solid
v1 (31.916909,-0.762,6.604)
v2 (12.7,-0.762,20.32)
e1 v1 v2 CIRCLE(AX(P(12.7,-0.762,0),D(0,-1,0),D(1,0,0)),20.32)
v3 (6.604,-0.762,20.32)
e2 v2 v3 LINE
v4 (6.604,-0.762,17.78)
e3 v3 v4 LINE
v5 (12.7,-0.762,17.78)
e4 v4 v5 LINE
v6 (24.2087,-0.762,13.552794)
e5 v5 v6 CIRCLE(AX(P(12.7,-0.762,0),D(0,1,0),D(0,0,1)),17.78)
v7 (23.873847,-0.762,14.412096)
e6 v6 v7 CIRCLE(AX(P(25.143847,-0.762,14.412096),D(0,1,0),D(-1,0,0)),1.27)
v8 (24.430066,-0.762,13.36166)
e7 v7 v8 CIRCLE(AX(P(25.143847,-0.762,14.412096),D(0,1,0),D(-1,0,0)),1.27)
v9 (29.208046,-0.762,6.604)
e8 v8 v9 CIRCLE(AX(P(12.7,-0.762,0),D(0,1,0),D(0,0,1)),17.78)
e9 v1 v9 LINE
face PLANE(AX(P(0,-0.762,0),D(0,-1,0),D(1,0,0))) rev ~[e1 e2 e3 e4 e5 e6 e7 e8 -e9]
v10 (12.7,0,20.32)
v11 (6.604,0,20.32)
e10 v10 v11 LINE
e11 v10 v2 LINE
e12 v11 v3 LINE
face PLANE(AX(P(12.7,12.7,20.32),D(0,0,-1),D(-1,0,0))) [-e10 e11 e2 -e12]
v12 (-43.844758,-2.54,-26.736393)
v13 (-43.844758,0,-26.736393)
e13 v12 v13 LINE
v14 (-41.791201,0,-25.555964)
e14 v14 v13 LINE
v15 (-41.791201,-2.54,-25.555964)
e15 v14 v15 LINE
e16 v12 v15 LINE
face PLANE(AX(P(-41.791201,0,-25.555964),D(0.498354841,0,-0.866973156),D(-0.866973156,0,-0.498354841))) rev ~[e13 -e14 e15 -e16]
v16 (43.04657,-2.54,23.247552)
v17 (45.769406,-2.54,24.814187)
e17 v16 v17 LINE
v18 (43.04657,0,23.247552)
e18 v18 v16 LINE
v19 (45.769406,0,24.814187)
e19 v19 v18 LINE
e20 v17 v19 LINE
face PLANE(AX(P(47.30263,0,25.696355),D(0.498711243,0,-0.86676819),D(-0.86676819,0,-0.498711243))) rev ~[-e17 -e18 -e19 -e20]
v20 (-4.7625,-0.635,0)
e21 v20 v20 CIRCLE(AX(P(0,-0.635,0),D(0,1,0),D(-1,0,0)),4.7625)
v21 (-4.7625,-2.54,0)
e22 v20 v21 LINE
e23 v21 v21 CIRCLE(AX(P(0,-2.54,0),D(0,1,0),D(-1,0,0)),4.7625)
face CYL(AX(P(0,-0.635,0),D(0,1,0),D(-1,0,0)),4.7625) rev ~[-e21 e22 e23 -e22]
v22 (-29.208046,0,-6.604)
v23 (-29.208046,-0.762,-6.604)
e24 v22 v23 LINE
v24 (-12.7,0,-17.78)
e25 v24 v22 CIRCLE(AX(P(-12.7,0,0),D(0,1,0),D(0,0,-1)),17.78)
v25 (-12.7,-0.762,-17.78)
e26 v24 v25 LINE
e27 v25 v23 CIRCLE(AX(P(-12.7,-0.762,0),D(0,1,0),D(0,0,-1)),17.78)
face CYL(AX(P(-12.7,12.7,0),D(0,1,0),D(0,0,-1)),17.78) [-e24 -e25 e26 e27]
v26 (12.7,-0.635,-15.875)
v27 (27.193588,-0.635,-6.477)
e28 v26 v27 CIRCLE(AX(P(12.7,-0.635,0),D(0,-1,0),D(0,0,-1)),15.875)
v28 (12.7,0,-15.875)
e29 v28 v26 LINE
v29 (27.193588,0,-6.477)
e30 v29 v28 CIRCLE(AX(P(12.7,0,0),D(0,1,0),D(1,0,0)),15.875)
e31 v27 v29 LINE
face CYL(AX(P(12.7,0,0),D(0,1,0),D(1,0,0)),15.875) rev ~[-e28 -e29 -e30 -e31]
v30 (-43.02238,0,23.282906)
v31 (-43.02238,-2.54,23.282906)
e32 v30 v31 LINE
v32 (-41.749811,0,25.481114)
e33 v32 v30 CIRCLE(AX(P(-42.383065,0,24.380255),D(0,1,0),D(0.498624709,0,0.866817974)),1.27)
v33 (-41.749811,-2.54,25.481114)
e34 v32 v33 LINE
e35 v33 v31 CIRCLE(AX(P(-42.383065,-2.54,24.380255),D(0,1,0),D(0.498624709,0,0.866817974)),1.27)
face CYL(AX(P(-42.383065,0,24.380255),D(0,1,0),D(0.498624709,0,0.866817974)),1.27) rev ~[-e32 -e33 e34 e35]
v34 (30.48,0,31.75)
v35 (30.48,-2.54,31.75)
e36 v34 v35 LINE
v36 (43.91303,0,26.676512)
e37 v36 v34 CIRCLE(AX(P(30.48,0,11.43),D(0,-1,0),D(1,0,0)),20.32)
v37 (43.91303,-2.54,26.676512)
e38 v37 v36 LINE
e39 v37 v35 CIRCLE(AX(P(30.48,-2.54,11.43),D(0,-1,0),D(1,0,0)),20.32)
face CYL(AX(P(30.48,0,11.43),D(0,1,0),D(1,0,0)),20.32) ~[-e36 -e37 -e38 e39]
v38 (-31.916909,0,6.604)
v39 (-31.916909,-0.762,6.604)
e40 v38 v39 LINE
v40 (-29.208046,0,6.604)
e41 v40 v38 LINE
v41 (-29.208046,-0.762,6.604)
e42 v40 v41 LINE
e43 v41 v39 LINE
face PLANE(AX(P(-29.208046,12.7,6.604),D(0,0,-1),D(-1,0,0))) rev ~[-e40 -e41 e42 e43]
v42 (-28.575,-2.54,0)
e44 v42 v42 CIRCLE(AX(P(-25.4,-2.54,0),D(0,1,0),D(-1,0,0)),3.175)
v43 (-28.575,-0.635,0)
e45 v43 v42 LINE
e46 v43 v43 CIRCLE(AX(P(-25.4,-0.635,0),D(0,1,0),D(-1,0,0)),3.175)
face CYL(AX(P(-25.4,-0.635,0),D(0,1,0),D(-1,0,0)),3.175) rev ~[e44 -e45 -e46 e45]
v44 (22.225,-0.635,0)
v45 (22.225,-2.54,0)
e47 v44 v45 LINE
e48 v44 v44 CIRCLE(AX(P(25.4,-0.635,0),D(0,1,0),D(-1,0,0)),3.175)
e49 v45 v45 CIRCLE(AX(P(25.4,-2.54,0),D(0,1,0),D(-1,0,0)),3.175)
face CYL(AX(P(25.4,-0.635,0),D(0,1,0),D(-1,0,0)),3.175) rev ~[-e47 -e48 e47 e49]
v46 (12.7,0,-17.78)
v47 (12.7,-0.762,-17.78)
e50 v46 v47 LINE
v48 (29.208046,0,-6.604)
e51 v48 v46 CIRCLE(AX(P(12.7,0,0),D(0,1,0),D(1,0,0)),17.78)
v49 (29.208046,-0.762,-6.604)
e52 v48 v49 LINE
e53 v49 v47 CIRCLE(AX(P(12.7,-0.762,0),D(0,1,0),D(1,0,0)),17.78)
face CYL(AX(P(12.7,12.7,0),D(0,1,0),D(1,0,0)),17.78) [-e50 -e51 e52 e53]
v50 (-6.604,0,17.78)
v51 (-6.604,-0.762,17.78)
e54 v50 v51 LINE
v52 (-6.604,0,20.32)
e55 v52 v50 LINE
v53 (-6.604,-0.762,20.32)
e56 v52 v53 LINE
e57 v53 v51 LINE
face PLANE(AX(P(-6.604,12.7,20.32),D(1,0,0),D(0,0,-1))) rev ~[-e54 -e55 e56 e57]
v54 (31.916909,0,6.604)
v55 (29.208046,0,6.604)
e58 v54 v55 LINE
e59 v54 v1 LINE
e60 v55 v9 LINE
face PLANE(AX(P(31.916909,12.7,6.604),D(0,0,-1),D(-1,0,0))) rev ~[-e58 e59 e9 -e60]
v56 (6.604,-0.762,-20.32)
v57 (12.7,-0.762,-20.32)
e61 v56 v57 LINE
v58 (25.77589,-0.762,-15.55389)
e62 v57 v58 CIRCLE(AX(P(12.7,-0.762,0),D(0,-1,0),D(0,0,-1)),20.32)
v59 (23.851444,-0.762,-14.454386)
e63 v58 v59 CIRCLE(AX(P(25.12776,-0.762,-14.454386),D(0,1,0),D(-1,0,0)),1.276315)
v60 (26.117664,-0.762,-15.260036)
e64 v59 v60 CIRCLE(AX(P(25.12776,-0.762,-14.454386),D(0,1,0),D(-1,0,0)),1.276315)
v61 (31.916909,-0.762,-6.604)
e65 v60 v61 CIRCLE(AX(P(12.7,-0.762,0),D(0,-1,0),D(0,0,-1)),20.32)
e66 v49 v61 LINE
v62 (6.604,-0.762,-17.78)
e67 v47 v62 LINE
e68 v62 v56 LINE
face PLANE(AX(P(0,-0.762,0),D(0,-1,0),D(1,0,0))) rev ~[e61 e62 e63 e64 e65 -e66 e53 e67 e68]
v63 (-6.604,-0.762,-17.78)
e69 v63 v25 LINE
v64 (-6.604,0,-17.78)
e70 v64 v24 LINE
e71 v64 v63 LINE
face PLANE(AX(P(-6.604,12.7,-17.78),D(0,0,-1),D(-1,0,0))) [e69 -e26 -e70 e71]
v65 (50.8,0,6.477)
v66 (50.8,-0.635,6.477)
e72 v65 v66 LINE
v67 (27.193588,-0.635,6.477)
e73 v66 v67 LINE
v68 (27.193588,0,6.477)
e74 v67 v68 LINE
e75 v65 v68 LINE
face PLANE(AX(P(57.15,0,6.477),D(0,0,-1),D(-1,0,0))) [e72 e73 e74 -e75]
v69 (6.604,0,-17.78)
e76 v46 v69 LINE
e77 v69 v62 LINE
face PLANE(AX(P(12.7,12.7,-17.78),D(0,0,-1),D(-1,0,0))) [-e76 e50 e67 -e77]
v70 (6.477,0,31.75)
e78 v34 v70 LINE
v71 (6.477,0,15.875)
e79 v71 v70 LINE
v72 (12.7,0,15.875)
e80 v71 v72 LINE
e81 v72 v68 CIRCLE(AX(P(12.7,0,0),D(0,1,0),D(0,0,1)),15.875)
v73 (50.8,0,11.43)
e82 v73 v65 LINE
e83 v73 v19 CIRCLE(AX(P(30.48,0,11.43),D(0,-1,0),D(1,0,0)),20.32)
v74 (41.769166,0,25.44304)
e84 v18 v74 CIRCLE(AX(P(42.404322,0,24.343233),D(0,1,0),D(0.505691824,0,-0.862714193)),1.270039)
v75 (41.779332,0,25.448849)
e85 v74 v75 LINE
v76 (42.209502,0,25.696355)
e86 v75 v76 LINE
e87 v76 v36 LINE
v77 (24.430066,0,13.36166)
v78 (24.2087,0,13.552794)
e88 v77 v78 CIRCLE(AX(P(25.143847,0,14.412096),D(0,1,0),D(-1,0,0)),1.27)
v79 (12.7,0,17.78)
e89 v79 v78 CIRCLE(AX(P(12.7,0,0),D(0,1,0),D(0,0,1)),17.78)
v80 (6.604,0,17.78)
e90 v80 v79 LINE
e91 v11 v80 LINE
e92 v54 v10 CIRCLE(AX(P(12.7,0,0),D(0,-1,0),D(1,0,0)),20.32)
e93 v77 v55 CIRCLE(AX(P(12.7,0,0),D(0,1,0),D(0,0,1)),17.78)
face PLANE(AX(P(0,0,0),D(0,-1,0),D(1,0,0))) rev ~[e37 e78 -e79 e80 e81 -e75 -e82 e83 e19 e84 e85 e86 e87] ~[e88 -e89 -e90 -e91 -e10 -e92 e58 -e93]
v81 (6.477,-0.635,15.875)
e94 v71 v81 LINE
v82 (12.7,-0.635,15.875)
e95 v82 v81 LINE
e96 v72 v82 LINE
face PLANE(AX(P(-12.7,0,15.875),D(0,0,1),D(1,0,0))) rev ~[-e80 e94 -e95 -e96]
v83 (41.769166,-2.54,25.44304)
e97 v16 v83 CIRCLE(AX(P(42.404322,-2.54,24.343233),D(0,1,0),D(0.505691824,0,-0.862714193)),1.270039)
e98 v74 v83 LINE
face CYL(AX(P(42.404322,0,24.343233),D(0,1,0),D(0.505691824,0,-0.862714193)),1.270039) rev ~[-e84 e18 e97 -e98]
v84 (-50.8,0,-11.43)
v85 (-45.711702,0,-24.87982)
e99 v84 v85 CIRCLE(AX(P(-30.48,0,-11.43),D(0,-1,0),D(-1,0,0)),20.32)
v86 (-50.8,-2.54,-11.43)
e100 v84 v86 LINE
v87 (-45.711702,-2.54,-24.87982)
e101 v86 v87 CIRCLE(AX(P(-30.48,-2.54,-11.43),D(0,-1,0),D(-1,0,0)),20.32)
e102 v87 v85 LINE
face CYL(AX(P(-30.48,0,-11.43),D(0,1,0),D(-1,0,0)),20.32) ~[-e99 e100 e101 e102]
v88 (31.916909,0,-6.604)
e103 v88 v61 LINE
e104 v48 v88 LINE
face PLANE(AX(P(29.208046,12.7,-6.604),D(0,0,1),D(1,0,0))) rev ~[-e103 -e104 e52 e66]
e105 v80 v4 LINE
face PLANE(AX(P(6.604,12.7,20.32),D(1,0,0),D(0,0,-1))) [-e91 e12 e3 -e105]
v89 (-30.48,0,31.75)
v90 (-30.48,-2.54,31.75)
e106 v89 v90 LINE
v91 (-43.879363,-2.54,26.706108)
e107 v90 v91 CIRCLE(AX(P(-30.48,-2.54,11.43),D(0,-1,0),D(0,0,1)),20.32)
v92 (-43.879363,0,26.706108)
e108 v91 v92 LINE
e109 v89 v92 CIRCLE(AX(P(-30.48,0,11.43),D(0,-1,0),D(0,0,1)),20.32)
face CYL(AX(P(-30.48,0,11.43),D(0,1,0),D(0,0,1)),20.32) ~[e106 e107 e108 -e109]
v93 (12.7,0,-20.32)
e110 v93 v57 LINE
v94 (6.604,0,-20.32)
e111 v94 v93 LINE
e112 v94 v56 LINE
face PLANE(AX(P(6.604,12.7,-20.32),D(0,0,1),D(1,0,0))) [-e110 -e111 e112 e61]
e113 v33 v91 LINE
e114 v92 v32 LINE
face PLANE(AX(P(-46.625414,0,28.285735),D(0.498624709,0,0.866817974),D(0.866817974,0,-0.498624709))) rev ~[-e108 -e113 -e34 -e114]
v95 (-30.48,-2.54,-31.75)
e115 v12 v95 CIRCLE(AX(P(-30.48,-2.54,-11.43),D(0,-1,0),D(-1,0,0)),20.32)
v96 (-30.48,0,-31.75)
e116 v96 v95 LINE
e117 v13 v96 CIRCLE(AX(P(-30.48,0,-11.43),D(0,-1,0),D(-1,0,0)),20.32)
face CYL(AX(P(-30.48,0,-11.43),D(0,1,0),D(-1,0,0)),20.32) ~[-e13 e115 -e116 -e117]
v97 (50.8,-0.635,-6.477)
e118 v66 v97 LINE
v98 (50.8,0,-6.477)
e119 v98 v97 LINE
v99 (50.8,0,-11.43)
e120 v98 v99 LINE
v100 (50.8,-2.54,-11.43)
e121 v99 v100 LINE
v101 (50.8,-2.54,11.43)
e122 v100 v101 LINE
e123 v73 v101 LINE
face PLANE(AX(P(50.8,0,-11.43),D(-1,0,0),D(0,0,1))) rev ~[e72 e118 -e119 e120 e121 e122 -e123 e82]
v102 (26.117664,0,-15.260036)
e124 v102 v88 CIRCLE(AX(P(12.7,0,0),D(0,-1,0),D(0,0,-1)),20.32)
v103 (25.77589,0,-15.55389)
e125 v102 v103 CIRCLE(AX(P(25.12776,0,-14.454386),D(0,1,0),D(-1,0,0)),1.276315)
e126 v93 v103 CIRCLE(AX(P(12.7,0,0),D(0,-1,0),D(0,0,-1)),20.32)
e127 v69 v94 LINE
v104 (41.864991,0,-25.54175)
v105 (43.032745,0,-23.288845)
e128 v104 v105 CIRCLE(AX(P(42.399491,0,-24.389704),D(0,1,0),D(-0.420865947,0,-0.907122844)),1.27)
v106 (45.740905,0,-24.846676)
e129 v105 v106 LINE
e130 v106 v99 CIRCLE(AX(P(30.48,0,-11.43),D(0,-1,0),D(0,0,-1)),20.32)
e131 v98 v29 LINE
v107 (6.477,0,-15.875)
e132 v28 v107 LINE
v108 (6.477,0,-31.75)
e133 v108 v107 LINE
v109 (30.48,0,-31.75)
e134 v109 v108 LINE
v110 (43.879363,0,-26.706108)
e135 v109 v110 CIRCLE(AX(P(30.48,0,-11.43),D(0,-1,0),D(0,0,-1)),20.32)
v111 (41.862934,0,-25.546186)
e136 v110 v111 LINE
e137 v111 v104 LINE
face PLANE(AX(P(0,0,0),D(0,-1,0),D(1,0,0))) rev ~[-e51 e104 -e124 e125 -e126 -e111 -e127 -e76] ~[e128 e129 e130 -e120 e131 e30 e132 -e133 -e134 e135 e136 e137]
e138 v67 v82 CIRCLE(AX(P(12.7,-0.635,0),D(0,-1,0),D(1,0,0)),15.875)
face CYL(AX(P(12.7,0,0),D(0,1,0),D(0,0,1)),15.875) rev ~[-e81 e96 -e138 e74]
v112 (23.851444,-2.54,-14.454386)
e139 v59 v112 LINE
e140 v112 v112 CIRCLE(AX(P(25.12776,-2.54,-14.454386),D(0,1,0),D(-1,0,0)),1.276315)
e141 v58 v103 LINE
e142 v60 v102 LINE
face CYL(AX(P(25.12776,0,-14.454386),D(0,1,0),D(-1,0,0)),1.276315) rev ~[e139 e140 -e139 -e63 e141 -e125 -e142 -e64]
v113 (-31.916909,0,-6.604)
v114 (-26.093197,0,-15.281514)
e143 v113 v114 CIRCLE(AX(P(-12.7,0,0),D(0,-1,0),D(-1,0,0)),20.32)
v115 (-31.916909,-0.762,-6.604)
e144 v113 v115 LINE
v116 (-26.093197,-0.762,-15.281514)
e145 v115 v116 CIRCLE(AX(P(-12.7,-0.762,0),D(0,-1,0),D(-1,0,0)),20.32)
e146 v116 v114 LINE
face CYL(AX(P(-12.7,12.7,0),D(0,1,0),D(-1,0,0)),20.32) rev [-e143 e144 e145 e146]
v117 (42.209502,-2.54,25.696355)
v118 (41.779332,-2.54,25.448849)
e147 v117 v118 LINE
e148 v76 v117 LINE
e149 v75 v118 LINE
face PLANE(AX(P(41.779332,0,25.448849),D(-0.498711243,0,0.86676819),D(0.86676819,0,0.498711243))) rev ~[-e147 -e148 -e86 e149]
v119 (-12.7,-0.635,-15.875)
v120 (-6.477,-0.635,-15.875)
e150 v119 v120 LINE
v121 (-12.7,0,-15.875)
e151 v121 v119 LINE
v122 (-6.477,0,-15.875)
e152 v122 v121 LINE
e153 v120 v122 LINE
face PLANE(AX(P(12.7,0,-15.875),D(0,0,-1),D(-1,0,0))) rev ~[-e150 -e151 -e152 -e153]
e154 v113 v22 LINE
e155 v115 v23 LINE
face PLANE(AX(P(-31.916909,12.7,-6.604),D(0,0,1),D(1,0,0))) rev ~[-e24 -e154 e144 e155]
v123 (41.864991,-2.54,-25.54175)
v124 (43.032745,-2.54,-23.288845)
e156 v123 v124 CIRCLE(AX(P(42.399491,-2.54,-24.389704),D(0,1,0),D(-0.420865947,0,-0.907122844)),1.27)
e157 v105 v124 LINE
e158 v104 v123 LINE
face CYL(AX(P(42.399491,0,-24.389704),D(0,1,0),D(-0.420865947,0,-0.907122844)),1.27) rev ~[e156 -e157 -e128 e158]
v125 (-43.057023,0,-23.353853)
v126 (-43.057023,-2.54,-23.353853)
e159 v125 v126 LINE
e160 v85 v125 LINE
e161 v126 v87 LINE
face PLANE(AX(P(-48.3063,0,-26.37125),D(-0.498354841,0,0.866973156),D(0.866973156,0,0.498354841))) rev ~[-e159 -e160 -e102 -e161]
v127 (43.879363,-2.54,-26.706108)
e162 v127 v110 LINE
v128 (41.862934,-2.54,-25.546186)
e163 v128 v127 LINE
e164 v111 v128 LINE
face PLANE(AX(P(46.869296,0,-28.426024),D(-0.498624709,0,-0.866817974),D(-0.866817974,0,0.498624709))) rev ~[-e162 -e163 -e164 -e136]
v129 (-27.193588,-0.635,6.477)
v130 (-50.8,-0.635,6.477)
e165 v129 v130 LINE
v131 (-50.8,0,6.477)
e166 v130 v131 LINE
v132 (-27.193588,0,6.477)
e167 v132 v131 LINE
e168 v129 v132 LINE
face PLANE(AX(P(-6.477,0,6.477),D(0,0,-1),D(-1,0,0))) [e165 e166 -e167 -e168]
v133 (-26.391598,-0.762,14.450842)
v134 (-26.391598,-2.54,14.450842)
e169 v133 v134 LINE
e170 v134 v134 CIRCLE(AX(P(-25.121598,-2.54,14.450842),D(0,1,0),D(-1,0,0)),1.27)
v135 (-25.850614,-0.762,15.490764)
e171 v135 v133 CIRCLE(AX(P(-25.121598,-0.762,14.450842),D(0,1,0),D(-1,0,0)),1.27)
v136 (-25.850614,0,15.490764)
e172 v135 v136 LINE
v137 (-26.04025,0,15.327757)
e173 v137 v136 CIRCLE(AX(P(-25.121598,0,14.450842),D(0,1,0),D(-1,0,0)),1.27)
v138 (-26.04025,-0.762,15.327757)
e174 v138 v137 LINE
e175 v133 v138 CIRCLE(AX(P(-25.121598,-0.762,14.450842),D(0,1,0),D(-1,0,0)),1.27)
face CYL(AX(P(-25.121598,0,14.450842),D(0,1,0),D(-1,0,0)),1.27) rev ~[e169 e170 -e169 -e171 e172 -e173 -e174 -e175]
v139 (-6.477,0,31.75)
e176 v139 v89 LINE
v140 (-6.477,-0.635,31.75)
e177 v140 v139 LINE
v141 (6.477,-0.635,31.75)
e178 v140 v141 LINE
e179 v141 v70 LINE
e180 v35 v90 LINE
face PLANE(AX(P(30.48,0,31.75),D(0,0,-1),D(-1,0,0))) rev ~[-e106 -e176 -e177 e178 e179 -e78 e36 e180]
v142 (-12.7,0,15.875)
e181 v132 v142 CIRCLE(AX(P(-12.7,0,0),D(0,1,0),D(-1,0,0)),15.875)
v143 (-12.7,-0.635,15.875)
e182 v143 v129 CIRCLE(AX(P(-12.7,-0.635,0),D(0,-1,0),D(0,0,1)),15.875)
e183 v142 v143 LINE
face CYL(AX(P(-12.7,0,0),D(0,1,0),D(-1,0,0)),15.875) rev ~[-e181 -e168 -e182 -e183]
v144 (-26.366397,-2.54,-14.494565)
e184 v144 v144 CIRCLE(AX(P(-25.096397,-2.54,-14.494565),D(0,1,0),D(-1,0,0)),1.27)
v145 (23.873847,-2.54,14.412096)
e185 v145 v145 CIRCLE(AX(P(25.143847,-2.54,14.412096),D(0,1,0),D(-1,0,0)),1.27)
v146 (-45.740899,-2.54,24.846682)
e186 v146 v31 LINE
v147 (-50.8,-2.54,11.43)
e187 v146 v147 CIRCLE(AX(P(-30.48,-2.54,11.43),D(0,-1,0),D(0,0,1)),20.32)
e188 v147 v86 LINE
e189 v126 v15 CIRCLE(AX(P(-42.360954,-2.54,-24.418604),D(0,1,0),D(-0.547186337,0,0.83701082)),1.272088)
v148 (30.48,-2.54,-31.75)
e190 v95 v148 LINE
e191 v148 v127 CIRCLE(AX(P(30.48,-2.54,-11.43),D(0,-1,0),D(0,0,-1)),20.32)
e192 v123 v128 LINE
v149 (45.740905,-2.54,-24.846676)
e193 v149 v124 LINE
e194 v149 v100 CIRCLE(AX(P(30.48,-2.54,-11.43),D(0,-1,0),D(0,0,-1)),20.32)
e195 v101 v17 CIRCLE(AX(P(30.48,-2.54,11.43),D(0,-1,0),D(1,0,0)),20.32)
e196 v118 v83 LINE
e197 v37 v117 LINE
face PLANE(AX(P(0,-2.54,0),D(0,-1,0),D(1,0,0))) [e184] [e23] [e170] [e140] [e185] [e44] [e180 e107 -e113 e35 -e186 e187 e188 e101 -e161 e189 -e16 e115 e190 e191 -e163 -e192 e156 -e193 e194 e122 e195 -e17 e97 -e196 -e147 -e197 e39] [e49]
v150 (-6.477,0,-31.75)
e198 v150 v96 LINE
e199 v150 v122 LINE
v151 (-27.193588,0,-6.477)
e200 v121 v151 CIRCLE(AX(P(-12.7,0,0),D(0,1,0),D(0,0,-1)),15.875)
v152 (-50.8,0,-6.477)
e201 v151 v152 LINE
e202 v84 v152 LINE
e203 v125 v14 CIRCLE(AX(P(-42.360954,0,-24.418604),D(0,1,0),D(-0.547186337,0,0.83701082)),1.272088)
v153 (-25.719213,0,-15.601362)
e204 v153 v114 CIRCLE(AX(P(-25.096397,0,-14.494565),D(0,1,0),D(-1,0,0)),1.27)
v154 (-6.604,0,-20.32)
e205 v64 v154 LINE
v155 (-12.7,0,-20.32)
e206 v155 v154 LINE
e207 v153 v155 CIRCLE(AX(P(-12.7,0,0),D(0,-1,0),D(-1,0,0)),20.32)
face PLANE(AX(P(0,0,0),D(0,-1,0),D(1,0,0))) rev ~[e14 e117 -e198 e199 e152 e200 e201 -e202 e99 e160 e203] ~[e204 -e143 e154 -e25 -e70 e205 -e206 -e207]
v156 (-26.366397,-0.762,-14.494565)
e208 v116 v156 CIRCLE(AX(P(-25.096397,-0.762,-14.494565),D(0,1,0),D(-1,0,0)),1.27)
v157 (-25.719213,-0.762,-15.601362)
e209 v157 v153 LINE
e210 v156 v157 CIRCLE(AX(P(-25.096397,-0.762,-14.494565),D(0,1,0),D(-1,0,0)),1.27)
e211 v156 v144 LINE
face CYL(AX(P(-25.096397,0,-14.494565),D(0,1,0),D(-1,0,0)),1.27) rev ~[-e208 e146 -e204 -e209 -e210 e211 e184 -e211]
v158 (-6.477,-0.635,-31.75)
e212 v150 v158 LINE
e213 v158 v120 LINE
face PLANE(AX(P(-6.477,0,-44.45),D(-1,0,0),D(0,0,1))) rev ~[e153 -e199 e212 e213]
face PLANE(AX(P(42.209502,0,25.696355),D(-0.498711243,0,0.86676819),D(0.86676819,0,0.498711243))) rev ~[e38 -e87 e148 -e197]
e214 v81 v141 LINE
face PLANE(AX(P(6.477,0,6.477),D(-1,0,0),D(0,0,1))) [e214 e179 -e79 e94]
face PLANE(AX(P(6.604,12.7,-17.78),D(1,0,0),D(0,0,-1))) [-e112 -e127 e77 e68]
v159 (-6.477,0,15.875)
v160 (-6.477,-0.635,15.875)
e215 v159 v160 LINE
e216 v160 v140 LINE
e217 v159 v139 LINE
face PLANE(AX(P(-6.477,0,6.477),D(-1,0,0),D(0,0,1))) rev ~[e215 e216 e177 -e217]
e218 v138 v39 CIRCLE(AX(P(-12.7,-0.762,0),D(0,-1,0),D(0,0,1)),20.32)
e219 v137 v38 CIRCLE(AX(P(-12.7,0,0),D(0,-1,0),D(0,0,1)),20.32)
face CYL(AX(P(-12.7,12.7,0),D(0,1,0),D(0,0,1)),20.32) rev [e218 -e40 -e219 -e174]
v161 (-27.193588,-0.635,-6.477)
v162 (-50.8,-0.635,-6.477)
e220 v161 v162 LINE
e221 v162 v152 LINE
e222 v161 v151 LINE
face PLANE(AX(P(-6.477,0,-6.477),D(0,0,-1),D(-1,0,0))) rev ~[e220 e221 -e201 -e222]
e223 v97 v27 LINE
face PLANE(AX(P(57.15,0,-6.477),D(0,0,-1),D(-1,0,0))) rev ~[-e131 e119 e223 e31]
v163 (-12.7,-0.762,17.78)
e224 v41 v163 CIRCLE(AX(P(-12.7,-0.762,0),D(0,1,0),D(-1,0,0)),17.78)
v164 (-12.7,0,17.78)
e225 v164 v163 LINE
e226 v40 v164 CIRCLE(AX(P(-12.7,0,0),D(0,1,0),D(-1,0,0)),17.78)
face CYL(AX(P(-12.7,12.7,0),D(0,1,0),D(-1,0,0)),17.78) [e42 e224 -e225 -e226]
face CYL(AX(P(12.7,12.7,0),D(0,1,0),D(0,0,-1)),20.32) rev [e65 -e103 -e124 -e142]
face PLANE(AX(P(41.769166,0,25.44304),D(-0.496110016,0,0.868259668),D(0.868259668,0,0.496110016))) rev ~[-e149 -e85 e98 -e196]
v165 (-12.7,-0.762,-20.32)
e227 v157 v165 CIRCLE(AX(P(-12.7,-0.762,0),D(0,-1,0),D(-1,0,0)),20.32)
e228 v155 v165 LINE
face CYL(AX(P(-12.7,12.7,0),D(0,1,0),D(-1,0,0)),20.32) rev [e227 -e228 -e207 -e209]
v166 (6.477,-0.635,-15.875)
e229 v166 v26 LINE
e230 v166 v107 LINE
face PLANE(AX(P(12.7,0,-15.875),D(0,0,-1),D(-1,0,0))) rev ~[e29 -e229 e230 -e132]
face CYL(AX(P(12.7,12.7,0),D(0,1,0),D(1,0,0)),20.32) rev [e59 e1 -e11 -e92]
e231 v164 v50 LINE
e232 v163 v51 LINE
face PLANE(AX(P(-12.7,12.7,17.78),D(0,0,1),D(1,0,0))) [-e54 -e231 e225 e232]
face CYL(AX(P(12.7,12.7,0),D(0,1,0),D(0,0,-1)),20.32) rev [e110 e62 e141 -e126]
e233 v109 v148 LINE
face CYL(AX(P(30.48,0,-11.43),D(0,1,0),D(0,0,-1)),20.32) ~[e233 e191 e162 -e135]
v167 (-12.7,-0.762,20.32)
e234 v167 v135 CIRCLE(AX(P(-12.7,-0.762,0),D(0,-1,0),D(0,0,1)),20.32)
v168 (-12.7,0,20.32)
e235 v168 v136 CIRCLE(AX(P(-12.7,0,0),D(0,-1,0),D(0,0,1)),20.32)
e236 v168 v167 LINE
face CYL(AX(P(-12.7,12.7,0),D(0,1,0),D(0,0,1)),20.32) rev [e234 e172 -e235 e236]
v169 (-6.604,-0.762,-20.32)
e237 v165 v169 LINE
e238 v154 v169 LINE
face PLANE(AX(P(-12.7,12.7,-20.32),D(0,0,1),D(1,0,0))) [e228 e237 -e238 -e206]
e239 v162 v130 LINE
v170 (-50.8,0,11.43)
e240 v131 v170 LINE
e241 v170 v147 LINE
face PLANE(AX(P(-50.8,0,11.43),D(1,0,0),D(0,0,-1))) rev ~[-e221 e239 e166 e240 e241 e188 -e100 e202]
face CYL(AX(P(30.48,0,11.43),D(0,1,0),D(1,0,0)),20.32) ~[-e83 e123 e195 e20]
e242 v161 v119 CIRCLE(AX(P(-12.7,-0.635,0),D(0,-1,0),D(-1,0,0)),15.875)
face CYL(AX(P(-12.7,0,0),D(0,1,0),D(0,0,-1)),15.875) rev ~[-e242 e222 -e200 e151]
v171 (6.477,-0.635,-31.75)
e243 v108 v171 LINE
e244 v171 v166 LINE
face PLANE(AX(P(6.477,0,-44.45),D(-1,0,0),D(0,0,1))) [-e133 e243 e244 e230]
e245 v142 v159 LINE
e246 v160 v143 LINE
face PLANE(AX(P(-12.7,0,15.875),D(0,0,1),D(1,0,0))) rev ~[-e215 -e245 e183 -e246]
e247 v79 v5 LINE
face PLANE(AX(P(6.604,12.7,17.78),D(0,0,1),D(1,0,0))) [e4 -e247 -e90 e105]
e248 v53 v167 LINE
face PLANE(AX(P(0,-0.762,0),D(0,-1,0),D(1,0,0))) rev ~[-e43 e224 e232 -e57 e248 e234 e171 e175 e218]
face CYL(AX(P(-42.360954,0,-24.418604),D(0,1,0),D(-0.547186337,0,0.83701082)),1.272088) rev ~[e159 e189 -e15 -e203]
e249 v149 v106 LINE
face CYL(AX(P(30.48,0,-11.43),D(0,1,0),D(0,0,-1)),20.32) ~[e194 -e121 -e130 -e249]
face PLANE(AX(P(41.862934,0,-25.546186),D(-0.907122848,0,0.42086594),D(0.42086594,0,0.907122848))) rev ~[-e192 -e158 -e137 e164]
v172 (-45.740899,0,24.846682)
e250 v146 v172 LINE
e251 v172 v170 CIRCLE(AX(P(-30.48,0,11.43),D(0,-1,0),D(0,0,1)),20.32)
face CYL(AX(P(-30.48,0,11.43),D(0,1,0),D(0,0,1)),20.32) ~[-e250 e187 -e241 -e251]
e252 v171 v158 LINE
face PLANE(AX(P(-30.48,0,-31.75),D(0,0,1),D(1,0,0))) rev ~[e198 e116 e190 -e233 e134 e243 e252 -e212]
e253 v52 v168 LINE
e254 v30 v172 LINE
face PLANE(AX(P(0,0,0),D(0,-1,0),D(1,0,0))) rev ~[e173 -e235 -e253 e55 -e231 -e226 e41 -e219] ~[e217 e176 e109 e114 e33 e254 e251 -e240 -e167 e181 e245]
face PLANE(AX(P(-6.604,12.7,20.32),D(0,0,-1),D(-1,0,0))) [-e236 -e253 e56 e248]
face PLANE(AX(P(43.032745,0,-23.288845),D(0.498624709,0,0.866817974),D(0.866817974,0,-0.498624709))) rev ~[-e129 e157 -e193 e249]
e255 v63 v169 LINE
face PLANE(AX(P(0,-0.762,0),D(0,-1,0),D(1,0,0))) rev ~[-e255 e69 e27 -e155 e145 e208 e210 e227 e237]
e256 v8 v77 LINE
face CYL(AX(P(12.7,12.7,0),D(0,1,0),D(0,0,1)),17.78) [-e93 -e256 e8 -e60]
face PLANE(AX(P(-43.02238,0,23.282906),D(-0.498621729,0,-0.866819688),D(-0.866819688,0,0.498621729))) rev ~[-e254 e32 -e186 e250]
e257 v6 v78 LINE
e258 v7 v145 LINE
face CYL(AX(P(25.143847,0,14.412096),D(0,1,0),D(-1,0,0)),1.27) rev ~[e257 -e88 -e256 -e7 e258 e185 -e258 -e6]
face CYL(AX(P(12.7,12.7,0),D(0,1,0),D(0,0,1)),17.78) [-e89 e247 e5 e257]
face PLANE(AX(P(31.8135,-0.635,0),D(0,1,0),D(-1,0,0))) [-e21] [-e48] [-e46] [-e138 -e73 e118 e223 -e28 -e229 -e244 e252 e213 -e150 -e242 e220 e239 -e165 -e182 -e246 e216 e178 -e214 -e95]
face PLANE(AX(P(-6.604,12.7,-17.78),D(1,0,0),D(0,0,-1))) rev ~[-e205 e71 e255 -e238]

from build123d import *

# Parameters (mm, degrees)
F1_DEPTH  = 2.54
F3_DEPTH  = 12.7
F5_DEPTH  = 52.071
F7_DEPTH  = 76.2
F9_DEPTH  = 25.4
F10_W     = 50.673
F10_H     = 12.954
F10_W_2   = 12.954
F10_H_2   = 37.973
F11_DEPTH = 0.635
F12_DEPTH = 13.462
F14_DEPTH = 1.905
F15_R     = 4.7625
F15_R_2   = 3.175
F16_DEPTH = 25.4
F17_R     = 1.2763153823
F17_R_2   = 1.27
F18_DEPTH = 25.4


# Not quite as in the source:
# - ends of sketch curves that miss each other by under 0.0002 mm in the source are joined


with BuildPart() as f1:
    # F0 (on Front) → F1 (new body)
    with BuildSketch(Plane.XZ):
        with BuildLine():
            Line((30.48, 31.75), (-30.48, 31.75))
            ThreePointArc((-30.48, 31.75), (-44.8484097937, 25.7984097937), (-50.8, 11.43))
            Line((-50.8, 11.43), (-50.8, -11.43))
            ThreePointArc((-50.8, -11.43), (-44.8484097937, -25.7984097937), (-30.48, -31.75))
            Line((-30.48, -31.75), (30.48, -31.75))
            ThreePointArc((30.48, -31.75), (44.8484097937, -25.7984097937), (50.8, -11.43))
            Line((50.8, -11.43), (50.8, 11.43))
            ThreePointArc((50.8, 11.43), (44.8484097937, 25.7984097937), (30.48, 31.75))
        make_face()
    extrude(amount=F1_DEPTH)

    # F2 (on Front) → F3 (join)
    with BuildSketch(Plane.XZ):
        with BuildLine():
            ThreePointArc((33.02, 0), (27.0684097937, 14.3684097937), (12.7, 20.32))
            Line((12.7, 20.32), (-12.7, 20.32))
            ThreePointArc((-12.7, 20.32), (-27.0684097937, 14.3684097937), (-33.02, 0))
            ThreePointArc((-33.02, 0), (-27.0684097937, -14.3684097937), (-12.7, -20.32))
            Line((-12.7, -20.32), (12.7, -20.32))
            ThreePointArc((12.7, -20.32), (27.0684097937, -14.3684097937), (33.02, 0))
        make_face()
        with BuildLine():
            ThreePointArc((-30.48, 0), (-25.2723585695, 12.5723585695), (-12.7, 17.78))
            Line((-12.7, 17.78), (12.7, 17.78))
            ThreePointArc((12.7, 17.78), (25.2723585695, 12.5723585695), (30.48, 0))
            ThreePointArc((30.48, 0), (25.2723585695, -12.5723585695), (12.7, -17.78))
            Line((12.7, -17.78), (-12.7, -17.78))
            ThreePointArc((-12.7, -17.78), (-25.2723585695, -12.5723585695), (-30.48, 0))
        make_face(mode=Mode.SUBTRACT)
    extrude(amount=-F3_DEPTH)

    # F4 (on face) → F5 (cut, through all)
    with BuildSketch(Plane.XY.offset(20.32)):
        Polygon((6.604, 12.7), (0, 12.7), (-6.604, 12.7), (-6.604, 0), (6.604, 0), align=None)
    extrude(amount=-F5_DEPTH, mode=Mode.SUBTRACT)

    # F6 (on Right) → F7 (cut, symmetric)
    with BuildSketch(Plane.YZ):
        Polygon((0, 6.604), (0, 0), (0, -6.604), (12.7, -6.604), (12.7, 6.604), align=None)
    extrude(amount=F7_DEPTH, both=True, mode=Mode.SUBTRACT)

    # F8 (on face) → F9 (cut)
    with BuildSketch(Plane(origin=(0, 0, 0), x_dir=(-1, 0, 0), z_dir=(0, 1, 0))):
        with BuildLine():
            Line((12.7, 15.875), (-12.7, 15.875))
            ThreePointArc((-12.7, 15.875), (-23.9253201513, 11.2253201513), (-28.575, 0))
            ThreePointArc((-28.575, 0), (-23.9253201513, -11.2253201513), (-12.7, -15.875))
            Line((-12.7, -15.875), (12.7, -15.875))
            ThreePointArc((12.7, -15.875), (23.9253201513, -11.2253201513), (28.575, 0))
            ThreePointArc((28.575, 0), (23.9253201513, 11.2253201513), (12.7, 15.875))
        make_face()
    extrude(amount=-F9_DEPTH, mode=Mode.SUBTRACT)

    # F10 (on face) → F11 (cut)
    with BuildSketch(Plane(origin=(0, 0, 0), x_dir=(-1, 0, 0), z_dir=(0, 1, 0))):
        with Locations((-31.8135, 0)):
            Rectangle(F10_W, F10_H)
        with Locations((0, 25.4635)):
            Rectangle(F10_W_2, F10_H_2)
        Rectangle(F10_W_2, F10_H)
        with Locations((31.8135, 0)):
            Rectangle(F10_W, F10_H)
        with Locations((0, -25.4635)):
            Rectangle(F10_W_2, F10_H_2)
    extrude(amount=-F11_DEPTH, mode=Mode.SUBTRACT)

    # F12 (cut): faces of the model
    f12_faces = [f1.faces().sort_by_distance(p)[0] for p in [
        (9.652, 12.7, -20.0320986266),
        (30.5624774214, 12.7, 6.8919013734),
        (-30.5624774214, 12.7, -6.8919013734),
        (-6.8919013734, 12.7, 19.05),
    ]]
    extrude(f12_faces, amount=-F12_DEPTH, mode=Mode.SUBTRACT)

    # F13 (on face) → F14 (join)
    with BuildSketch(Plane.XZ.offset(2.54)):
        with BuildLine():
            Line((-12.7, -15.875), (12.7, -15.875))
            ThreePointArc((12.7, -15.875), (23.9253201513, -11.2253201513), (28.575, 0))
            ThreePointArc((28.575, 0), (23.9253201513, 11.2253201513), (12.7, 15.875))
            Line((12.7, 15.875), (-12.7, 15.875))
            ThreePointArc((-12.7, 15.875), (-23.9253201513, 11.2253201513), (-28.575, 0))
            ThreePointArc((-28.575, 0), (-23.9253201513, -11.2253201513), (-12.7, -15.875))
        make_face()
    extrude(amount=-F14_DEPTH)

    # F15 (on face) → F16 (cut)
    with BuildSketch(Plane(origin=(0, -0.635, 0), x_dir=(-1, 0, 0), z_dir=(0, 1, 0))):
        Circle(F15_R)
        with Locations((-25.4, 0)):
            Circle(F15_R_2)
        with Locations((25.4, 0)):
            Circle(F15_R_2)
    extrude(amount=-F16_DEPTH, mode=Mode.SUBTRACT)

    # F17 (on face) → F18 (cut)
    with BuildSketch(Plane(origin=(0, 0, 0), x_dir=(-1, 0, 0), z_dir=(0, 1, 0))):
        Polygon((47.6680542115, -27.4815886288), (51.1667876586, -29.4946501669), (47.6696745814, -27.4787697193), align=None)
        with BuildLine():
            Line((47.0404791933, -28.5733623005), (47.6680542115, -27.4815886288))
            Line((47.6680542115, -27.4815886288), (47.6696745814, -27.4787697193))
            Line((47.6696745814, -27.4787697193), (48.3063004883, -26.3712504847))
            Line((48.3063004883, -26.3712504847), (43.0570225864, -23.3538525016))
            ThreePointArc((43.0570225864, -23.3538525016), (41.2580877478, -23.7846525937), (41.7912012914, -25.5559643173))
            Line((41.7912012914, -25.5559643173), (47.0404791933, -28.5733623005))
        make_face()
        with Locations((-25.1277598759, -14.4543864422)):
            Circle(F17_R)
        with Locations((-25.1438466209, 14.4120964147)):
            Circle(F17_R_2)
        with Locations((25.1215984181, 14.4508421512)):
            Circle(F17_R_2)
        with Locations((25.0963969645, -14.4945646834)):
            Circle(F17_R_2)
        with BuildLine():
            ThreePointArc((-41.8649914427, -25.5417502167), (-41.2719571065, -23.8052669732), (-43.0327445767, -23.2888453782))
            Line((-43.0327445767, -23.2888453782), (-48.1358024341, -26.2243068229))
            Line((-48.1358024341, -26.2243068229), (-46.8692956724, -28.4260244757))
            Line((-46.8692956724, -28.4260244757), (-41.8629335005, -25.5461858486))
            Line((-41.8629335005, -25.5461858486), (-41.8649914427, -25.5417502167))
        make_face()
        with BuildLine():
            ThreePointArc((-43.0465700311, 23.2475518967), (-41.3065716807, 23.7045275153), (-41.7691664779, 25.443040394))
            Line((-41.7691664779, 25.443040394), (-41.7793320219, 25.4488488271))
            Line((-41.7793320219, 25.4488488271), (-42.2095022754, 25.6963553049))
            Line((-42.2095022754, 25.6963553049), (-46.0359033246, 27.8979465087))
            Line((-46.0359033246, 27.8979465087), (-47.302629882, 25.6963553049))
            Line((-47.302629882, 25.6963553049), (-43.0465700311, 23.2475518967))
        make_face()
        with BuildLine():
            Line((46.6254135383, 28.2857347472), (41.7498114349, 25.4811139895))
            ThreePointArc((41.7498114349, 25.4811139895), (41.2839564144, 23.7439684966), (43.0223799296, 23.2829055446))
            Line((43.0223799296, 23.2829055446), (47.8919203, 26.0840170944))
            Line((47.8919203, 26.0840170944), (46.6254135383, 28.2857347472))
        make_face()
    extrude(amount=-F18_DEPTH, mode=Mode.SUBTRACT)


solid = f1.part
